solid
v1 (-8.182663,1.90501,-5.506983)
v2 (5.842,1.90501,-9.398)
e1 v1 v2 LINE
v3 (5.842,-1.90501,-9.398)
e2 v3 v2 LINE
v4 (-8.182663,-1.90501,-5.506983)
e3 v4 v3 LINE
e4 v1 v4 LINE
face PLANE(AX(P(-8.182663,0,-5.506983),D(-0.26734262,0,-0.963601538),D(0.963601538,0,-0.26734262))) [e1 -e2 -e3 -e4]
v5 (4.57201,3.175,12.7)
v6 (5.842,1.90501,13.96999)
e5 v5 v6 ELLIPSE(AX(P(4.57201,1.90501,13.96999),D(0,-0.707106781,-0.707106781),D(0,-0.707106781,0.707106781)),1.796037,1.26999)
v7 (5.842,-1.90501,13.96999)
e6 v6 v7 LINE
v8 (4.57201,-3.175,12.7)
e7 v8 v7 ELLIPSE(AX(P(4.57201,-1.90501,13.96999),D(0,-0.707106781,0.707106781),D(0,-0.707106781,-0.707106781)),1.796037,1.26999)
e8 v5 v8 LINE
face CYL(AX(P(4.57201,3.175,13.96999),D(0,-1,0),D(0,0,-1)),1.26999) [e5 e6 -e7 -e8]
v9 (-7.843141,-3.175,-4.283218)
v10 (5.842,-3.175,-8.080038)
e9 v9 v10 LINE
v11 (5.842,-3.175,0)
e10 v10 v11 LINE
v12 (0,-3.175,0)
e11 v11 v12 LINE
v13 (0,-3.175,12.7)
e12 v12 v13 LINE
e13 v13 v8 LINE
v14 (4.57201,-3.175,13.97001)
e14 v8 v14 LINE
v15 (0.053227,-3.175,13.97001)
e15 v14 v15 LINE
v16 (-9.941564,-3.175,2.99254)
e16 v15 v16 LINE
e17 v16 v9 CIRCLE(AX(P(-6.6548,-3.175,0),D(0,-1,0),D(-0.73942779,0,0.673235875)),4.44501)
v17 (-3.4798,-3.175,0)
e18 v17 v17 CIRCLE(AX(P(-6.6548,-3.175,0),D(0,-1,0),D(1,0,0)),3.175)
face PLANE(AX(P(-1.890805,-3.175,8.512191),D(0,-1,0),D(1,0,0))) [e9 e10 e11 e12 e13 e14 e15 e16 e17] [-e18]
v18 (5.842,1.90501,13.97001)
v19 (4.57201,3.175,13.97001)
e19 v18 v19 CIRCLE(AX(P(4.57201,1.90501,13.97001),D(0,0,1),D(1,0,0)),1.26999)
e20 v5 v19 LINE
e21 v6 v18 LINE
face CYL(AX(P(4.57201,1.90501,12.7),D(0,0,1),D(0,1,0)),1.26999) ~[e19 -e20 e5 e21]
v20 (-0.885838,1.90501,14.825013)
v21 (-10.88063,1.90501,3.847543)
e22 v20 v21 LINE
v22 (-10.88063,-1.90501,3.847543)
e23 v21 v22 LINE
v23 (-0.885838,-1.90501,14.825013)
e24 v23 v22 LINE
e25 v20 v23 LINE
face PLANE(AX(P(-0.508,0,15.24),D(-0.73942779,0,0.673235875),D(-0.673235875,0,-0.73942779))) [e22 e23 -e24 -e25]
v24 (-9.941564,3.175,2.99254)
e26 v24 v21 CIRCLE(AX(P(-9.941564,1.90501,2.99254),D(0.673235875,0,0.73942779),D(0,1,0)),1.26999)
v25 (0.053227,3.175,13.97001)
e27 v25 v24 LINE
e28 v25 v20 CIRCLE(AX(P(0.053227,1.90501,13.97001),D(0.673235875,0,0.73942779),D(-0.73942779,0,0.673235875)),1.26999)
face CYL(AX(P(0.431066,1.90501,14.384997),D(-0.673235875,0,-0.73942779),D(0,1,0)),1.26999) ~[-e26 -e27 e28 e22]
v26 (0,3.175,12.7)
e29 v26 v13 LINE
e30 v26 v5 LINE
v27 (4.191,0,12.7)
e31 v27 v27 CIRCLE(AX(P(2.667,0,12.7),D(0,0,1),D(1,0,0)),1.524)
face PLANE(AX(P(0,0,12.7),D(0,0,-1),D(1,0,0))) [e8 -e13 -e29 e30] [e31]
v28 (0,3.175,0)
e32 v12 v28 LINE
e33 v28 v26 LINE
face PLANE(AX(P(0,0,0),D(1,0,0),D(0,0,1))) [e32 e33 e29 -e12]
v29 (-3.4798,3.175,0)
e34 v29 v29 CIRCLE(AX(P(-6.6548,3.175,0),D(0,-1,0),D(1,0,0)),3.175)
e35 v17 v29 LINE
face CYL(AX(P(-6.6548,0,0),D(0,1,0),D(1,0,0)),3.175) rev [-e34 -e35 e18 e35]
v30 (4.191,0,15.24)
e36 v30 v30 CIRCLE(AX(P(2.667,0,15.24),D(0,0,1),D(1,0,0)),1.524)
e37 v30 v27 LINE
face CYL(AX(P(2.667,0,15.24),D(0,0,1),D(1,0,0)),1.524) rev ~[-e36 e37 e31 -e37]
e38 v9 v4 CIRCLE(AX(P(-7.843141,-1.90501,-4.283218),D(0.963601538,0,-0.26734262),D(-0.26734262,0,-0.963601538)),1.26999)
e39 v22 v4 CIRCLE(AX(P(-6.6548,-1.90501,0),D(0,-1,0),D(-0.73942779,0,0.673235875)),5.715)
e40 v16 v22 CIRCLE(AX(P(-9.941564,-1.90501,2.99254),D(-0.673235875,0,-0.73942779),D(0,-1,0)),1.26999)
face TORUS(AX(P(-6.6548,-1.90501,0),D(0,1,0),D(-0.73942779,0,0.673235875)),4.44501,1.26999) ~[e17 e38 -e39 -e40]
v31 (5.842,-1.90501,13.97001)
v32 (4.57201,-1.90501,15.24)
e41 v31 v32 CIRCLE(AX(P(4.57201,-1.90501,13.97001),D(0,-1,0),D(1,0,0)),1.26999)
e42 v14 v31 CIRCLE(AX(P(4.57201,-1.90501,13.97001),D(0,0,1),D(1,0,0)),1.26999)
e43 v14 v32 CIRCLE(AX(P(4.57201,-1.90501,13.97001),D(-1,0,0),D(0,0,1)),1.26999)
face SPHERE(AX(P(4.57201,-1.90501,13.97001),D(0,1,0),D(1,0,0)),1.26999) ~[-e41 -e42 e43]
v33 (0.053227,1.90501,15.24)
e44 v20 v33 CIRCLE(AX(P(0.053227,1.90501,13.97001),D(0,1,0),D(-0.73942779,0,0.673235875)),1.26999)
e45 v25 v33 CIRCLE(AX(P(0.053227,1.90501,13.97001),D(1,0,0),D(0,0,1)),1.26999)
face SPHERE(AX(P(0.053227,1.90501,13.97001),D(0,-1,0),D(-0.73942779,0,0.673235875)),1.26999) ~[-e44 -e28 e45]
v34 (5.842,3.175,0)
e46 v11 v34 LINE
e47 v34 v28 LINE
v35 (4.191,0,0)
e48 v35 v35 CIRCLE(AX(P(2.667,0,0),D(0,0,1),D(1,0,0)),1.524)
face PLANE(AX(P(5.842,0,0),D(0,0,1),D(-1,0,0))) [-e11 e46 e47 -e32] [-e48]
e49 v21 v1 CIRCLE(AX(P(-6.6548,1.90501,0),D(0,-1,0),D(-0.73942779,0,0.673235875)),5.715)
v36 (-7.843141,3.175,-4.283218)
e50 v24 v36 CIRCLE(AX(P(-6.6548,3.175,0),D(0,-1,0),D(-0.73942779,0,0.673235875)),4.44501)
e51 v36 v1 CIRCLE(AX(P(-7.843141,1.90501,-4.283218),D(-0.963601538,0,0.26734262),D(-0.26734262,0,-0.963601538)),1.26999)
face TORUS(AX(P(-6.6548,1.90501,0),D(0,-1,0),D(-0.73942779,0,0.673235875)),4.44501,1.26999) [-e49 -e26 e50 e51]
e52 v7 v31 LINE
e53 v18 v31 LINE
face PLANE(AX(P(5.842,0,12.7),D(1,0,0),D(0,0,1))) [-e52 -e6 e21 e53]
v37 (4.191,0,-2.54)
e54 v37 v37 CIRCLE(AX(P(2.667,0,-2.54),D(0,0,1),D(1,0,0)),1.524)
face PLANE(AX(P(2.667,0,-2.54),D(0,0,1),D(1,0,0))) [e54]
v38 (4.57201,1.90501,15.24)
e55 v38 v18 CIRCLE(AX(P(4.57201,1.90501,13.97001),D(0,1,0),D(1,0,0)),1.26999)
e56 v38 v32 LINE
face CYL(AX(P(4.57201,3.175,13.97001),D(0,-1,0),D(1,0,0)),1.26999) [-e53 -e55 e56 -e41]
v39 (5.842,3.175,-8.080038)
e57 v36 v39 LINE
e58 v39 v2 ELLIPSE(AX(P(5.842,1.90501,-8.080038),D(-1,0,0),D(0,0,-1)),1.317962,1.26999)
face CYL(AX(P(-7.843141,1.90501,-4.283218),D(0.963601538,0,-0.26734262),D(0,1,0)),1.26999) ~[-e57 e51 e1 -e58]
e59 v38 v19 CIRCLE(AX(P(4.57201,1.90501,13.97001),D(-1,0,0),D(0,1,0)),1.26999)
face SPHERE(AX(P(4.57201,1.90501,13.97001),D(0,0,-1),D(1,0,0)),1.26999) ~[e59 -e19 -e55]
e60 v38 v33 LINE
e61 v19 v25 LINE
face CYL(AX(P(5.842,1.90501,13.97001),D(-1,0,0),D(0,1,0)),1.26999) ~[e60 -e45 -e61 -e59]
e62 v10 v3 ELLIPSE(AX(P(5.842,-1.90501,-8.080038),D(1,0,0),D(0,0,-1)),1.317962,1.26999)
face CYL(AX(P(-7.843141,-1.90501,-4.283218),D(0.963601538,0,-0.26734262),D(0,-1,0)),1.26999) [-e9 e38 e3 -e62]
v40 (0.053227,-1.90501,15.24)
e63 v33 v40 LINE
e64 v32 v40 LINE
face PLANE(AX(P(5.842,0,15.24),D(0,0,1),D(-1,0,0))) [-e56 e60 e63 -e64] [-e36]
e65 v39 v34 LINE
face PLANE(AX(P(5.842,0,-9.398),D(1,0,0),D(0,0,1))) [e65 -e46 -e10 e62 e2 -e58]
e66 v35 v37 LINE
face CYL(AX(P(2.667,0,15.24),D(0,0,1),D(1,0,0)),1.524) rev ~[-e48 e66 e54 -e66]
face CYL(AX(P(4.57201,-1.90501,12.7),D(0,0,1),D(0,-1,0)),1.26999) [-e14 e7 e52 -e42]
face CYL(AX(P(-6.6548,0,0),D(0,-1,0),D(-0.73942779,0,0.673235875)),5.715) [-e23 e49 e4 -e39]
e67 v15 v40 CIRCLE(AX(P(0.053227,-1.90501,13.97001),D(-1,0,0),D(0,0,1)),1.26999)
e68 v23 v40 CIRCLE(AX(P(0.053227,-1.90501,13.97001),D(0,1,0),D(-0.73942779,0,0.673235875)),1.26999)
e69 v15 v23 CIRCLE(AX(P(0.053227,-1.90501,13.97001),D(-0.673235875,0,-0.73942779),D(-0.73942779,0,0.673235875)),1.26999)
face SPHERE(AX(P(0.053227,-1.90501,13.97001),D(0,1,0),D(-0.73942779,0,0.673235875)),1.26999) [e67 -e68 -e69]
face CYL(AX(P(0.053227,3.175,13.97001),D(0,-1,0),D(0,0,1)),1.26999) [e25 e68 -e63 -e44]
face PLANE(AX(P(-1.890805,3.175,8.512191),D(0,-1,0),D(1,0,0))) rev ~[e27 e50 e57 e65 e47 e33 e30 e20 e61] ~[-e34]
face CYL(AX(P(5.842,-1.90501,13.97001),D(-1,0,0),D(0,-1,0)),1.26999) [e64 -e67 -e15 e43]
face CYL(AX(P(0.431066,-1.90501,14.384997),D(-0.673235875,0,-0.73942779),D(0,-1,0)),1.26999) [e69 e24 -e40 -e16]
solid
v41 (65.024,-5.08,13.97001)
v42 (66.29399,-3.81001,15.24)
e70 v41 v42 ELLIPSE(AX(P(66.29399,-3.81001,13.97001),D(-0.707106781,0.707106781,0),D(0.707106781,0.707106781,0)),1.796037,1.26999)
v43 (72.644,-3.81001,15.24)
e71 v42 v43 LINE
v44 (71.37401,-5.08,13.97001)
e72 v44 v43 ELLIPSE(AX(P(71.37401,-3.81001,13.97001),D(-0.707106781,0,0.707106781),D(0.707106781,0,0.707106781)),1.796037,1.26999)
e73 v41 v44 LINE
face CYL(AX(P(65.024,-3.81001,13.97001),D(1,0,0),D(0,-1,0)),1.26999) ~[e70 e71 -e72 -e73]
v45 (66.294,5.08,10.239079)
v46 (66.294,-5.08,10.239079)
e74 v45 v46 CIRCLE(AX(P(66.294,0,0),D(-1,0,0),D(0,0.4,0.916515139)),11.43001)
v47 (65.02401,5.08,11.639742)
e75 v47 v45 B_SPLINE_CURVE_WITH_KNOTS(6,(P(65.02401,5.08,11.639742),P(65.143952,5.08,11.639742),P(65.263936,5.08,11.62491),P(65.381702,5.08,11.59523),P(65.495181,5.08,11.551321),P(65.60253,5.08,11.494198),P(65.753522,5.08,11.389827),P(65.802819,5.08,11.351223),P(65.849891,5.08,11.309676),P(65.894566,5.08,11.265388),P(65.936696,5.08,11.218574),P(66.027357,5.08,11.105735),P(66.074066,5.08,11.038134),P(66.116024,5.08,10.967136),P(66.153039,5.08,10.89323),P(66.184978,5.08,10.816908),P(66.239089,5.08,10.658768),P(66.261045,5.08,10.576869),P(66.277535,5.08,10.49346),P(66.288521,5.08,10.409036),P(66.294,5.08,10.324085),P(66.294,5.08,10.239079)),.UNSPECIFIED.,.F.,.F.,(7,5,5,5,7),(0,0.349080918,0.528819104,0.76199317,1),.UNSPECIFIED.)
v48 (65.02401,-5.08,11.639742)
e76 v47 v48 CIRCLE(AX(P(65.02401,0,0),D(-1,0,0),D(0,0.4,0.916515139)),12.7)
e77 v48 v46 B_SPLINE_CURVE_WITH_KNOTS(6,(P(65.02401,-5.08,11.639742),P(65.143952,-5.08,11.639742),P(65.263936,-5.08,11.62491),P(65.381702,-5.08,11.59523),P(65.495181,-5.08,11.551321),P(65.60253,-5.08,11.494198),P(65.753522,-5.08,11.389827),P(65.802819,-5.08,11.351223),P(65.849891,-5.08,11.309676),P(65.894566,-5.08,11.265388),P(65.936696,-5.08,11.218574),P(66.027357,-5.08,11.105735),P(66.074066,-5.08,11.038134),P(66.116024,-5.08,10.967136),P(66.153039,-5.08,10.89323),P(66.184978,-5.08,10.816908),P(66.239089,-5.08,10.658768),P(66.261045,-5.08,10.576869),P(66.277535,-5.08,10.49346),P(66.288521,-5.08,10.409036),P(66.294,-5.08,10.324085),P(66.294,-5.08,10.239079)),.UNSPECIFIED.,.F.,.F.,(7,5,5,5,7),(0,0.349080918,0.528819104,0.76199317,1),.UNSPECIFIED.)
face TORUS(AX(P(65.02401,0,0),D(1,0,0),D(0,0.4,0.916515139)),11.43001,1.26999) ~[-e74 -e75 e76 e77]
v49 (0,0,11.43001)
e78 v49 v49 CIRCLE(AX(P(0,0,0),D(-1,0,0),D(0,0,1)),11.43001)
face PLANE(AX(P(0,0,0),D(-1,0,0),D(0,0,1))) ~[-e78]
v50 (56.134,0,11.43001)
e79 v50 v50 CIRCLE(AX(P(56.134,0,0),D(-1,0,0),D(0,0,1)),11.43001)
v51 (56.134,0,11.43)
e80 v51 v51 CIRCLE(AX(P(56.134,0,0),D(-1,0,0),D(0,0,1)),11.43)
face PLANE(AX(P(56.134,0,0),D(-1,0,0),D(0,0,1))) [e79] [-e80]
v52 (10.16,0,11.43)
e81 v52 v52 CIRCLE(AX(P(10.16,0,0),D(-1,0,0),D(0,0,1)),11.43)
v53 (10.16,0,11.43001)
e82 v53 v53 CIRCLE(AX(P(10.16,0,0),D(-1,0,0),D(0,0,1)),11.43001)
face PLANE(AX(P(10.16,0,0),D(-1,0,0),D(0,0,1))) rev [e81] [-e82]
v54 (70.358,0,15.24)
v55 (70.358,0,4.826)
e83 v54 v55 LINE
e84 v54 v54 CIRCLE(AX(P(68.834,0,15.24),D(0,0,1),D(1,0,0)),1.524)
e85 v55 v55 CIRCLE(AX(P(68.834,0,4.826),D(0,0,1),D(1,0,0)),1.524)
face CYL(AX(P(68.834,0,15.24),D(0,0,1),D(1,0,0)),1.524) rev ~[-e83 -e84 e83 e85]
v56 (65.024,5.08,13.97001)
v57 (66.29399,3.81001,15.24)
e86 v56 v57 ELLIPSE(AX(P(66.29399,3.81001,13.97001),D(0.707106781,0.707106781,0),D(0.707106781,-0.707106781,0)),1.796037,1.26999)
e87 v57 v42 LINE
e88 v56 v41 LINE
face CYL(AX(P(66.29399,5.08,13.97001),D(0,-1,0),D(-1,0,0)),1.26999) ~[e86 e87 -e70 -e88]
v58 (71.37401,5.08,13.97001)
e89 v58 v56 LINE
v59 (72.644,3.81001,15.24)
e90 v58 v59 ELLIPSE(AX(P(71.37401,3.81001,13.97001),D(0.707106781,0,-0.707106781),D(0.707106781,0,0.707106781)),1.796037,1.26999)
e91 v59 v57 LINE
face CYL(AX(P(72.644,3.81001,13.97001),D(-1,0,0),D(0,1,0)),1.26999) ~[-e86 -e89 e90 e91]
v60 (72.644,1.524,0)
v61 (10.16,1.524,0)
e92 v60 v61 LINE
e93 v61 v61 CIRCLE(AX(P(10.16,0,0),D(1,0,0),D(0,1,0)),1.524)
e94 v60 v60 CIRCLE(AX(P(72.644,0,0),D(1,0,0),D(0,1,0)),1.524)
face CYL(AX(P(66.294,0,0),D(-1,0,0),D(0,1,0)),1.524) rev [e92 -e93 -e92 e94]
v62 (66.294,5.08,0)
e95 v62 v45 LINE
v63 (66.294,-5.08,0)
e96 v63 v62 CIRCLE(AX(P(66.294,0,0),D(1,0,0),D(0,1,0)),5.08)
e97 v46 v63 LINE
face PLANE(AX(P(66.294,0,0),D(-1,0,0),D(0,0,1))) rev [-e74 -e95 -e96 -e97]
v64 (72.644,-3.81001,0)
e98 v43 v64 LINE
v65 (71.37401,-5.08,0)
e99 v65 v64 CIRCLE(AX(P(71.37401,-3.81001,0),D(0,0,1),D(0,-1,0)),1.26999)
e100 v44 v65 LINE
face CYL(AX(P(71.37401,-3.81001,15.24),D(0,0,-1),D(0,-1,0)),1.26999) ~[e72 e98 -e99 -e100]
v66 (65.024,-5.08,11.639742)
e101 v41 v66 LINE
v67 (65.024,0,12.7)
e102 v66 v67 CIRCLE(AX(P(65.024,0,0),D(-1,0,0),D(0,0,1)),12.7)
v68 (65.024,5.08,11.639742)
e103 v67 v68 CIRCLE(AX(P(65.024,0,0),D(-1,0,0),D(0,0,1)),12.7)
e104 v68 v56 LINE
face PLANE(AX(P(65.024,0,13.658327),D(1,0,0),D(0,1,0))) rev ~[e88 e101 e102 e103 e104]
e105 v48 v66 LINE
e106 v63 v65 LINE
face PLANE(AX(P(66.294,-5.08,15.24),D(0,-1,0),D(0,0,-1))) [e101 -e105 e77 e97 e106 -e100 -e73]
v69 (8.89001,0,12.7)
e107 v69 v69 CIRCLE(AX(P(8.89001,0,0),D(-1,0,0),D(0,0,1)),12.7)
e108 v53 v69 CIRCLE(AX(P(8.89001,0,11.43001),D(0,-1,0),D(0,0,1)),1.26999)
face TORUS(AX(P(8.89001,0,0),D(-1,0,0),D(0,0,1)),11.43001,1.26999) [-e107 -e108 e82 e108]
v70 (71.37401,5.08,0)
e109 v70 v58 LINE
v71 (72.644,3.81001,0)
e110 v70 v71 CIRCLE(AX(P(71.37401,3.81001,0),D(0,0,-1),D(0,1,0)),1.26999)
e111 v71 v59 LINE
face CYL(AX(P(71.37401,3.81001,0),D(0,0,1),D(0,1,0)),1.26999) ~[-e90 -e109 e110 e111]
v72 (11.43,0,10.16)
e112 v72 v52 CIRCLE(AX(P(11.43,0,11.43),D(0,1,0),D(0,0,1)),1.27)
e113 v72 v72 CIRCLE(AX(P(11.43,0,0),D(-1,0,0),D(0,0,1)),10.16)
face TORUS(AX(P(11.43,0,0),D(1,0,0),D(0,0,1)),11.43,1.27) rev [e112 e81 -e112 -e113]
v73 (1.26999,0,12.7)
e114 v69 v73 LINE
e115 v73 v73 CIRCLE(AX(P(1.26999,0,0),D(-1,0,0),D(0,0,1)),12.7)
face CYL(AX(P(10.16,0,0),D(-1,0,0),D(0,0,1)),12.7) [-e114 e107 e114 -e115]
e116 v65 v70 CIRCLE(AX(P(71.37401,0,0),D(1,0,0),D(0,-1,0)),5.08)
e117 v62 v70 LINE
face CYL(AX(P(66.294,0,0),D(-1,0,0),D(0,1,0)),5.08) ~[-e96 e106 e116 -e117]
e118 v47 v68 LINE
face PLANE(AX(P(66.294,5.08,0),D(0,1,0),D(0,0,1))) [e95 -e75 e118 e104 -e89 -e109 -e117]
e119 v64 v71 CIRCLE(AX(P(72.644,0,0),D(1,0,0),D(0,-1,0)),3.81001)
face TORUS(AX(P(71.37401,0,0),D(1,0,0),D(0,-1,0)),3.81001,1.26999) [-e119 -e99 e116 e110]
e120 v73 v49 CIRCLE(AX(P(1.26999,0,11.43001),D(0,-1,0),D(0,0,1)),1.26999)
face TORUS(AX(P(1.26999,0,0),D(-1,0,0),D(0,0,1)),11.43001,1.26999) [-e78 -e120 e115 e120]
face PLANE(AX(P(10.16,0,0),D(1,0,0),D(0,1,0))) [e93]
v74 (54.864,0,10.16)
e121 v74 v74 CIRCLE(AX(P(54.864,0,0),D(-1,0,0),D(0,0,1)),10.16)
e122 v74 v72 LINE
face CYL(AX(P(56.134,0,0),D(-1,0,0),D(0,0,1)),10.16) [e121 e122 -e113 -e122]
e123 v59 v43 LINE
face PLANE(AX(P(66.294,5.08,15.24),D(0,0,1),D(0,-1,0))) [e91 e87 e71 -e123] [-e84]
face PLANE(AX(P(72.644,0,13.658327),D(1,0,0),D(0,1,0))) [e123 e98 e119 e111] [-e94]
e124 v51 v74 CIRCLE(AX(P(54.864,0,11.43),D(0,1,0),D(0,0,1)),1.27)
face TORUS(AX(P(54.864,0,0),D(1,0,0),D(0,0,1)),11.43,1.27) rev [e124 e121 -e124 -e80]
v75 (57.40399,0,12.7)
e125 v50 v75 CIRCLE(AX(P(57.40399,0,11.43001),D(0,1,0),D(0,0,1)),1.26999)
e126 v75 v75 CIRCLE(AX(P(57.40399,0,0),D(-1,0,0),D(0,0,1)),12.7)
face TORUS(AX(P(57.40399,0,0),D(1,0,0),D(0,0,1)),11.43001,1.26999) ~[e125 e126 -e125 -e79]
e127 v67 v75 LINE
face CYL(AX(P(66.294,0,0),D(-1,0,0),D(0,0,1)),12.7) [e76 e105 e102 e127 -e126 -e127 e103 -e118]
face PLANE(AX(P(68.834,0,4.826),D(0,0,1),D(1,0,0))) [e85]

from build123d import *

# Parameters (mm, degrees)
F0_W     = 5.842
F0_H     = 12.7
F0_R     = 3.175
F2_DEPTH = 3.175
F3_R     = 1.524
F4_DEPTH = 56.134
F5_DEPTH = 6.35
F6_DEPTH = 1.27
F7_R     = 1.524
F8_DEPTH = 17.78
F9_DEPTH = 10.414
F10_R    = 1.27
F11_R    = 1.26999
F11_2_R  = 1.26999
F12_R    = 1.26999


# Not quite as in the source:
# - a fillet or chamfer is up to 0.001 mm smaller than in the source, because OpenCascade refuses the exact size


with BuildPart() as f1:
    # F0 (on Front) → F1 (revolve)
    with BuildSketch(Plane.XZ):
        Polygon((5.842, 12.7), (5.842, 0), (66.294, 0), (66.294, 12.7), (56.134, 12.7), (56.134, 10.16), (10.16, 10.16), (10.16, 12.7), align=None)
        with Locations((2.921, 6.35)):
            Rectangle(F0_W, F0_H)
    revolve(axis=Axis((33.147, 0, 0), (-1, 0, 0)))

    # F3 (on face) → F4 (cut, through all)
    with BuildSketch(Plane.YZ.offset(66.294)):
        Circle(F3_R)
    extrude(amount=-F4_DEPTH, mode=Mode.SUBTRACT)

    # F3 (on face) → F5 (join)
    with BuildSketch(Plane.YZ.offset(66.294)):
        with BuildLine():
            ThreePointArc((-5.08, 11.6397422652), (0, 12.7), (5.08, 11.6397422652))
            Line((5.08, 11.6397422652), (5.08, 15.24))
            Line((5.08, 15.24), (-5.08, 15.24))
            Line((-5.08, 15.24), (-5.08, 11.6397422652))
        make_face()
        with BuildLine():
            ThreePointArc((-5.08, 0), (0, 5.08), (5.08, 0))
            Line((5.08, 0), (5.08, 11.6397422652))
            ThreePointArc((5.08, 11.6397422652), (0, 12.7), (-5.08, 11.6397422652))
            Line((-5.08, 11.6397422652), (-5.08, 0))
        make_face()
        with BuildLine():
            ThreePointArc((-5.08, 0), (0, -5.08), (5.08, 0))
            ThreePointArc((5.08, 0), (0, 5.08), (-5.08, 0))
        make_face()
        Circle(F3_R, mode=Mode.SUBTRACT)
    extrude(amount=F5_DEPTH)

    # F3 (on face) → F6 (join)
    with BuildSketch(Plane.YZ.offset(66.294)):
        with BuildLine():
            ThreePointArc((-5.08, 11.6397422652), (0, 12.7), (5.08, 11.6397422652))
            Line((5.08, 11.6397422652), (5.08, 15.24))
            Line((5.08, 15.24), (-5.08, 15.24))
            Line((-5.08, 15.24), (-5.08, 11.6397422652))
        make_face()
        with BuildLine():
            ThreePointArc((-5.08, 0), (0, 5.08), (5.08, 0))
            Line((5.08, 0), (5.08, 11.6397422652))
            ThreePointArc((5.08, 11.6397422652), (0, 12.7), (-5.08, 11.6397422652))
            Line((-5.08, 11.6397422652), (-5.08, 0))
        make_face()
        with BuildLine():
            ThreePointArc((-5.08, 0), (0, -5.08), (5.08, 0))
            ThreePointArc((5.08, 0), (0, 5.08), (-5.08, 0))
        make_face()
        Circle(F3_R, mode=Mode.SUBTRACT)
    extrude(amount=-F6_DEPTH)

    # F7 (on face) → F9 (cut)
    with BuildSketch(Plane.XY.offset(15.24)):
        with Locations((68.834, 0)):
            Circle(F7_R)
    extrude(amount=-F9_DEPTH, mode=Mode.SUBTRACT)

    # F10
    f10_edges = [f1.edges().sort_by_distance(p)[0] for p in [
        (56.134, 0, -10.16),
        (10.16, 0, -10.16),
        (33.147, 0, 10.16),
    ]]
    fillet(f10_edges, radius=F10_R)

    # F11 (radius 1.27 in the source; OpenCascade refuses exactly that, so slightly less here)
    f11_edges = [f1.edges().sort_by_distance(p)[0] for p in [
        (10.16, 0, -12.7),
        (0, 0, -12.7),
        (5.08, 0, 12.7),
    ]]
    fillet(f11_edges, radius=F11_R)

    # F12 (radius 1.27 in the source; OpenCascade refuses exactly that, so slightly less here)
    f12_edges = [f1.edges().sort_by_distance(p)[0] for p in [
        (66.294, 0, -12.7),
        (56.134, 0, -12.7),
        (68.834, -5.08, 15.24),
        (72.644, -5.08, 7.62),
        (65.024, 0, 15.24),
        (68.834, 5.08, 15.24),
        (72.644, 5.08, 7.62),
        (72.644, 0, -5.08),
    ]]
    fillet(f12_edges, radius=F12_R)


with BuildPart() as f2:
    # F0 (on Front) → F2 (new body, symmetric)
    with BuildSketch(Plane.XZ):
        with BuildLine():
            Line((-0.9398, 0), (0, 0))
            Line((0, 0), (0, 12.7))
            Line((0, 12.7), (5.842, 12.7))
            Line((5.842, 12.7), (5.842, 15.24))
            Line((5.842, 15.24), (-0.508, 15.24))
            Line((-0.508, 15.24), (-10.8806298187, 3.8475430269))
            ThreePointArc((-10.8806298187, 3.8475430269), (-4.5919612295, 5.3297205562), (-0.9398, 0))
        make_face()
        with BuildLine():
            ThreePointArc((-8.1826630726, -5.5069827884), (-3.1957909266, -4.5493385486), (-0.9398, 0))
            ThreePointArc((-0.9398, 0), (-4.5919612295, 5.3297205562), (-10.8806298187, 3.8475430269))
            ThreePointArc((-10.8806298187, 3.8475430269), (-12.1459778134, -1.5837270034), (-8.1826630726, -5.5069827884))
        make_face()
        with Locations((-6.6548, 0)):
            Circle(F0_R, mode=Mode.SUBTRACT)
        with BuildLine():
            Line((5.842, 0), (0, 0))
            Line((0, 0), (-0.9398, 0))
            ThreePointArc((-0.9398, 0), (-3.1957909266, -4.5493385486), (-8.1826630726, -5.5069827884))
            Line((-8.1826630726, -5.5069827884), (5.842, -9.398))
            Line((5.842, -9.398), (5.842, 0))
        make_face()
    extrude(amount=F2_DEPTH, both=True)

    # F7 (on face) → F8 (cut)
    with BuildSketch(Plane.XY.offset(15.24)):
        with Locations((2.667, 0)):
            Circle(F7_R)
    extrude(amount=-F8_DEPTH, mode=Mode.SUBTRACT)

    # F11#2 (radius 1.27 in the source; OpenCascade refuses exactly that, so slightly less here)
    f11_2_edges = [f2.edges().sort_by_distance(p)[0] for p in [
        (-0.508, 0, 15.24),
        (-5.694315, 3.175, 9.543772),
        (-10.88063, 0, 3.847543),
        (-5.694315, -3.175, 9.543772),
        (5.842, 0, 12.7),
        (5.842, 3.175, 13.97),
        (5.842, 0, 15.24),
        (5.842, -3.175, 13.97),
        (2.667, -3.175, 15.24),
        (2.667, 3.175, 15.24),
    ]]
    fillet(f11_2_edges, radius=F11_2_R)


solid = Compound([f1.part, f2.part])
